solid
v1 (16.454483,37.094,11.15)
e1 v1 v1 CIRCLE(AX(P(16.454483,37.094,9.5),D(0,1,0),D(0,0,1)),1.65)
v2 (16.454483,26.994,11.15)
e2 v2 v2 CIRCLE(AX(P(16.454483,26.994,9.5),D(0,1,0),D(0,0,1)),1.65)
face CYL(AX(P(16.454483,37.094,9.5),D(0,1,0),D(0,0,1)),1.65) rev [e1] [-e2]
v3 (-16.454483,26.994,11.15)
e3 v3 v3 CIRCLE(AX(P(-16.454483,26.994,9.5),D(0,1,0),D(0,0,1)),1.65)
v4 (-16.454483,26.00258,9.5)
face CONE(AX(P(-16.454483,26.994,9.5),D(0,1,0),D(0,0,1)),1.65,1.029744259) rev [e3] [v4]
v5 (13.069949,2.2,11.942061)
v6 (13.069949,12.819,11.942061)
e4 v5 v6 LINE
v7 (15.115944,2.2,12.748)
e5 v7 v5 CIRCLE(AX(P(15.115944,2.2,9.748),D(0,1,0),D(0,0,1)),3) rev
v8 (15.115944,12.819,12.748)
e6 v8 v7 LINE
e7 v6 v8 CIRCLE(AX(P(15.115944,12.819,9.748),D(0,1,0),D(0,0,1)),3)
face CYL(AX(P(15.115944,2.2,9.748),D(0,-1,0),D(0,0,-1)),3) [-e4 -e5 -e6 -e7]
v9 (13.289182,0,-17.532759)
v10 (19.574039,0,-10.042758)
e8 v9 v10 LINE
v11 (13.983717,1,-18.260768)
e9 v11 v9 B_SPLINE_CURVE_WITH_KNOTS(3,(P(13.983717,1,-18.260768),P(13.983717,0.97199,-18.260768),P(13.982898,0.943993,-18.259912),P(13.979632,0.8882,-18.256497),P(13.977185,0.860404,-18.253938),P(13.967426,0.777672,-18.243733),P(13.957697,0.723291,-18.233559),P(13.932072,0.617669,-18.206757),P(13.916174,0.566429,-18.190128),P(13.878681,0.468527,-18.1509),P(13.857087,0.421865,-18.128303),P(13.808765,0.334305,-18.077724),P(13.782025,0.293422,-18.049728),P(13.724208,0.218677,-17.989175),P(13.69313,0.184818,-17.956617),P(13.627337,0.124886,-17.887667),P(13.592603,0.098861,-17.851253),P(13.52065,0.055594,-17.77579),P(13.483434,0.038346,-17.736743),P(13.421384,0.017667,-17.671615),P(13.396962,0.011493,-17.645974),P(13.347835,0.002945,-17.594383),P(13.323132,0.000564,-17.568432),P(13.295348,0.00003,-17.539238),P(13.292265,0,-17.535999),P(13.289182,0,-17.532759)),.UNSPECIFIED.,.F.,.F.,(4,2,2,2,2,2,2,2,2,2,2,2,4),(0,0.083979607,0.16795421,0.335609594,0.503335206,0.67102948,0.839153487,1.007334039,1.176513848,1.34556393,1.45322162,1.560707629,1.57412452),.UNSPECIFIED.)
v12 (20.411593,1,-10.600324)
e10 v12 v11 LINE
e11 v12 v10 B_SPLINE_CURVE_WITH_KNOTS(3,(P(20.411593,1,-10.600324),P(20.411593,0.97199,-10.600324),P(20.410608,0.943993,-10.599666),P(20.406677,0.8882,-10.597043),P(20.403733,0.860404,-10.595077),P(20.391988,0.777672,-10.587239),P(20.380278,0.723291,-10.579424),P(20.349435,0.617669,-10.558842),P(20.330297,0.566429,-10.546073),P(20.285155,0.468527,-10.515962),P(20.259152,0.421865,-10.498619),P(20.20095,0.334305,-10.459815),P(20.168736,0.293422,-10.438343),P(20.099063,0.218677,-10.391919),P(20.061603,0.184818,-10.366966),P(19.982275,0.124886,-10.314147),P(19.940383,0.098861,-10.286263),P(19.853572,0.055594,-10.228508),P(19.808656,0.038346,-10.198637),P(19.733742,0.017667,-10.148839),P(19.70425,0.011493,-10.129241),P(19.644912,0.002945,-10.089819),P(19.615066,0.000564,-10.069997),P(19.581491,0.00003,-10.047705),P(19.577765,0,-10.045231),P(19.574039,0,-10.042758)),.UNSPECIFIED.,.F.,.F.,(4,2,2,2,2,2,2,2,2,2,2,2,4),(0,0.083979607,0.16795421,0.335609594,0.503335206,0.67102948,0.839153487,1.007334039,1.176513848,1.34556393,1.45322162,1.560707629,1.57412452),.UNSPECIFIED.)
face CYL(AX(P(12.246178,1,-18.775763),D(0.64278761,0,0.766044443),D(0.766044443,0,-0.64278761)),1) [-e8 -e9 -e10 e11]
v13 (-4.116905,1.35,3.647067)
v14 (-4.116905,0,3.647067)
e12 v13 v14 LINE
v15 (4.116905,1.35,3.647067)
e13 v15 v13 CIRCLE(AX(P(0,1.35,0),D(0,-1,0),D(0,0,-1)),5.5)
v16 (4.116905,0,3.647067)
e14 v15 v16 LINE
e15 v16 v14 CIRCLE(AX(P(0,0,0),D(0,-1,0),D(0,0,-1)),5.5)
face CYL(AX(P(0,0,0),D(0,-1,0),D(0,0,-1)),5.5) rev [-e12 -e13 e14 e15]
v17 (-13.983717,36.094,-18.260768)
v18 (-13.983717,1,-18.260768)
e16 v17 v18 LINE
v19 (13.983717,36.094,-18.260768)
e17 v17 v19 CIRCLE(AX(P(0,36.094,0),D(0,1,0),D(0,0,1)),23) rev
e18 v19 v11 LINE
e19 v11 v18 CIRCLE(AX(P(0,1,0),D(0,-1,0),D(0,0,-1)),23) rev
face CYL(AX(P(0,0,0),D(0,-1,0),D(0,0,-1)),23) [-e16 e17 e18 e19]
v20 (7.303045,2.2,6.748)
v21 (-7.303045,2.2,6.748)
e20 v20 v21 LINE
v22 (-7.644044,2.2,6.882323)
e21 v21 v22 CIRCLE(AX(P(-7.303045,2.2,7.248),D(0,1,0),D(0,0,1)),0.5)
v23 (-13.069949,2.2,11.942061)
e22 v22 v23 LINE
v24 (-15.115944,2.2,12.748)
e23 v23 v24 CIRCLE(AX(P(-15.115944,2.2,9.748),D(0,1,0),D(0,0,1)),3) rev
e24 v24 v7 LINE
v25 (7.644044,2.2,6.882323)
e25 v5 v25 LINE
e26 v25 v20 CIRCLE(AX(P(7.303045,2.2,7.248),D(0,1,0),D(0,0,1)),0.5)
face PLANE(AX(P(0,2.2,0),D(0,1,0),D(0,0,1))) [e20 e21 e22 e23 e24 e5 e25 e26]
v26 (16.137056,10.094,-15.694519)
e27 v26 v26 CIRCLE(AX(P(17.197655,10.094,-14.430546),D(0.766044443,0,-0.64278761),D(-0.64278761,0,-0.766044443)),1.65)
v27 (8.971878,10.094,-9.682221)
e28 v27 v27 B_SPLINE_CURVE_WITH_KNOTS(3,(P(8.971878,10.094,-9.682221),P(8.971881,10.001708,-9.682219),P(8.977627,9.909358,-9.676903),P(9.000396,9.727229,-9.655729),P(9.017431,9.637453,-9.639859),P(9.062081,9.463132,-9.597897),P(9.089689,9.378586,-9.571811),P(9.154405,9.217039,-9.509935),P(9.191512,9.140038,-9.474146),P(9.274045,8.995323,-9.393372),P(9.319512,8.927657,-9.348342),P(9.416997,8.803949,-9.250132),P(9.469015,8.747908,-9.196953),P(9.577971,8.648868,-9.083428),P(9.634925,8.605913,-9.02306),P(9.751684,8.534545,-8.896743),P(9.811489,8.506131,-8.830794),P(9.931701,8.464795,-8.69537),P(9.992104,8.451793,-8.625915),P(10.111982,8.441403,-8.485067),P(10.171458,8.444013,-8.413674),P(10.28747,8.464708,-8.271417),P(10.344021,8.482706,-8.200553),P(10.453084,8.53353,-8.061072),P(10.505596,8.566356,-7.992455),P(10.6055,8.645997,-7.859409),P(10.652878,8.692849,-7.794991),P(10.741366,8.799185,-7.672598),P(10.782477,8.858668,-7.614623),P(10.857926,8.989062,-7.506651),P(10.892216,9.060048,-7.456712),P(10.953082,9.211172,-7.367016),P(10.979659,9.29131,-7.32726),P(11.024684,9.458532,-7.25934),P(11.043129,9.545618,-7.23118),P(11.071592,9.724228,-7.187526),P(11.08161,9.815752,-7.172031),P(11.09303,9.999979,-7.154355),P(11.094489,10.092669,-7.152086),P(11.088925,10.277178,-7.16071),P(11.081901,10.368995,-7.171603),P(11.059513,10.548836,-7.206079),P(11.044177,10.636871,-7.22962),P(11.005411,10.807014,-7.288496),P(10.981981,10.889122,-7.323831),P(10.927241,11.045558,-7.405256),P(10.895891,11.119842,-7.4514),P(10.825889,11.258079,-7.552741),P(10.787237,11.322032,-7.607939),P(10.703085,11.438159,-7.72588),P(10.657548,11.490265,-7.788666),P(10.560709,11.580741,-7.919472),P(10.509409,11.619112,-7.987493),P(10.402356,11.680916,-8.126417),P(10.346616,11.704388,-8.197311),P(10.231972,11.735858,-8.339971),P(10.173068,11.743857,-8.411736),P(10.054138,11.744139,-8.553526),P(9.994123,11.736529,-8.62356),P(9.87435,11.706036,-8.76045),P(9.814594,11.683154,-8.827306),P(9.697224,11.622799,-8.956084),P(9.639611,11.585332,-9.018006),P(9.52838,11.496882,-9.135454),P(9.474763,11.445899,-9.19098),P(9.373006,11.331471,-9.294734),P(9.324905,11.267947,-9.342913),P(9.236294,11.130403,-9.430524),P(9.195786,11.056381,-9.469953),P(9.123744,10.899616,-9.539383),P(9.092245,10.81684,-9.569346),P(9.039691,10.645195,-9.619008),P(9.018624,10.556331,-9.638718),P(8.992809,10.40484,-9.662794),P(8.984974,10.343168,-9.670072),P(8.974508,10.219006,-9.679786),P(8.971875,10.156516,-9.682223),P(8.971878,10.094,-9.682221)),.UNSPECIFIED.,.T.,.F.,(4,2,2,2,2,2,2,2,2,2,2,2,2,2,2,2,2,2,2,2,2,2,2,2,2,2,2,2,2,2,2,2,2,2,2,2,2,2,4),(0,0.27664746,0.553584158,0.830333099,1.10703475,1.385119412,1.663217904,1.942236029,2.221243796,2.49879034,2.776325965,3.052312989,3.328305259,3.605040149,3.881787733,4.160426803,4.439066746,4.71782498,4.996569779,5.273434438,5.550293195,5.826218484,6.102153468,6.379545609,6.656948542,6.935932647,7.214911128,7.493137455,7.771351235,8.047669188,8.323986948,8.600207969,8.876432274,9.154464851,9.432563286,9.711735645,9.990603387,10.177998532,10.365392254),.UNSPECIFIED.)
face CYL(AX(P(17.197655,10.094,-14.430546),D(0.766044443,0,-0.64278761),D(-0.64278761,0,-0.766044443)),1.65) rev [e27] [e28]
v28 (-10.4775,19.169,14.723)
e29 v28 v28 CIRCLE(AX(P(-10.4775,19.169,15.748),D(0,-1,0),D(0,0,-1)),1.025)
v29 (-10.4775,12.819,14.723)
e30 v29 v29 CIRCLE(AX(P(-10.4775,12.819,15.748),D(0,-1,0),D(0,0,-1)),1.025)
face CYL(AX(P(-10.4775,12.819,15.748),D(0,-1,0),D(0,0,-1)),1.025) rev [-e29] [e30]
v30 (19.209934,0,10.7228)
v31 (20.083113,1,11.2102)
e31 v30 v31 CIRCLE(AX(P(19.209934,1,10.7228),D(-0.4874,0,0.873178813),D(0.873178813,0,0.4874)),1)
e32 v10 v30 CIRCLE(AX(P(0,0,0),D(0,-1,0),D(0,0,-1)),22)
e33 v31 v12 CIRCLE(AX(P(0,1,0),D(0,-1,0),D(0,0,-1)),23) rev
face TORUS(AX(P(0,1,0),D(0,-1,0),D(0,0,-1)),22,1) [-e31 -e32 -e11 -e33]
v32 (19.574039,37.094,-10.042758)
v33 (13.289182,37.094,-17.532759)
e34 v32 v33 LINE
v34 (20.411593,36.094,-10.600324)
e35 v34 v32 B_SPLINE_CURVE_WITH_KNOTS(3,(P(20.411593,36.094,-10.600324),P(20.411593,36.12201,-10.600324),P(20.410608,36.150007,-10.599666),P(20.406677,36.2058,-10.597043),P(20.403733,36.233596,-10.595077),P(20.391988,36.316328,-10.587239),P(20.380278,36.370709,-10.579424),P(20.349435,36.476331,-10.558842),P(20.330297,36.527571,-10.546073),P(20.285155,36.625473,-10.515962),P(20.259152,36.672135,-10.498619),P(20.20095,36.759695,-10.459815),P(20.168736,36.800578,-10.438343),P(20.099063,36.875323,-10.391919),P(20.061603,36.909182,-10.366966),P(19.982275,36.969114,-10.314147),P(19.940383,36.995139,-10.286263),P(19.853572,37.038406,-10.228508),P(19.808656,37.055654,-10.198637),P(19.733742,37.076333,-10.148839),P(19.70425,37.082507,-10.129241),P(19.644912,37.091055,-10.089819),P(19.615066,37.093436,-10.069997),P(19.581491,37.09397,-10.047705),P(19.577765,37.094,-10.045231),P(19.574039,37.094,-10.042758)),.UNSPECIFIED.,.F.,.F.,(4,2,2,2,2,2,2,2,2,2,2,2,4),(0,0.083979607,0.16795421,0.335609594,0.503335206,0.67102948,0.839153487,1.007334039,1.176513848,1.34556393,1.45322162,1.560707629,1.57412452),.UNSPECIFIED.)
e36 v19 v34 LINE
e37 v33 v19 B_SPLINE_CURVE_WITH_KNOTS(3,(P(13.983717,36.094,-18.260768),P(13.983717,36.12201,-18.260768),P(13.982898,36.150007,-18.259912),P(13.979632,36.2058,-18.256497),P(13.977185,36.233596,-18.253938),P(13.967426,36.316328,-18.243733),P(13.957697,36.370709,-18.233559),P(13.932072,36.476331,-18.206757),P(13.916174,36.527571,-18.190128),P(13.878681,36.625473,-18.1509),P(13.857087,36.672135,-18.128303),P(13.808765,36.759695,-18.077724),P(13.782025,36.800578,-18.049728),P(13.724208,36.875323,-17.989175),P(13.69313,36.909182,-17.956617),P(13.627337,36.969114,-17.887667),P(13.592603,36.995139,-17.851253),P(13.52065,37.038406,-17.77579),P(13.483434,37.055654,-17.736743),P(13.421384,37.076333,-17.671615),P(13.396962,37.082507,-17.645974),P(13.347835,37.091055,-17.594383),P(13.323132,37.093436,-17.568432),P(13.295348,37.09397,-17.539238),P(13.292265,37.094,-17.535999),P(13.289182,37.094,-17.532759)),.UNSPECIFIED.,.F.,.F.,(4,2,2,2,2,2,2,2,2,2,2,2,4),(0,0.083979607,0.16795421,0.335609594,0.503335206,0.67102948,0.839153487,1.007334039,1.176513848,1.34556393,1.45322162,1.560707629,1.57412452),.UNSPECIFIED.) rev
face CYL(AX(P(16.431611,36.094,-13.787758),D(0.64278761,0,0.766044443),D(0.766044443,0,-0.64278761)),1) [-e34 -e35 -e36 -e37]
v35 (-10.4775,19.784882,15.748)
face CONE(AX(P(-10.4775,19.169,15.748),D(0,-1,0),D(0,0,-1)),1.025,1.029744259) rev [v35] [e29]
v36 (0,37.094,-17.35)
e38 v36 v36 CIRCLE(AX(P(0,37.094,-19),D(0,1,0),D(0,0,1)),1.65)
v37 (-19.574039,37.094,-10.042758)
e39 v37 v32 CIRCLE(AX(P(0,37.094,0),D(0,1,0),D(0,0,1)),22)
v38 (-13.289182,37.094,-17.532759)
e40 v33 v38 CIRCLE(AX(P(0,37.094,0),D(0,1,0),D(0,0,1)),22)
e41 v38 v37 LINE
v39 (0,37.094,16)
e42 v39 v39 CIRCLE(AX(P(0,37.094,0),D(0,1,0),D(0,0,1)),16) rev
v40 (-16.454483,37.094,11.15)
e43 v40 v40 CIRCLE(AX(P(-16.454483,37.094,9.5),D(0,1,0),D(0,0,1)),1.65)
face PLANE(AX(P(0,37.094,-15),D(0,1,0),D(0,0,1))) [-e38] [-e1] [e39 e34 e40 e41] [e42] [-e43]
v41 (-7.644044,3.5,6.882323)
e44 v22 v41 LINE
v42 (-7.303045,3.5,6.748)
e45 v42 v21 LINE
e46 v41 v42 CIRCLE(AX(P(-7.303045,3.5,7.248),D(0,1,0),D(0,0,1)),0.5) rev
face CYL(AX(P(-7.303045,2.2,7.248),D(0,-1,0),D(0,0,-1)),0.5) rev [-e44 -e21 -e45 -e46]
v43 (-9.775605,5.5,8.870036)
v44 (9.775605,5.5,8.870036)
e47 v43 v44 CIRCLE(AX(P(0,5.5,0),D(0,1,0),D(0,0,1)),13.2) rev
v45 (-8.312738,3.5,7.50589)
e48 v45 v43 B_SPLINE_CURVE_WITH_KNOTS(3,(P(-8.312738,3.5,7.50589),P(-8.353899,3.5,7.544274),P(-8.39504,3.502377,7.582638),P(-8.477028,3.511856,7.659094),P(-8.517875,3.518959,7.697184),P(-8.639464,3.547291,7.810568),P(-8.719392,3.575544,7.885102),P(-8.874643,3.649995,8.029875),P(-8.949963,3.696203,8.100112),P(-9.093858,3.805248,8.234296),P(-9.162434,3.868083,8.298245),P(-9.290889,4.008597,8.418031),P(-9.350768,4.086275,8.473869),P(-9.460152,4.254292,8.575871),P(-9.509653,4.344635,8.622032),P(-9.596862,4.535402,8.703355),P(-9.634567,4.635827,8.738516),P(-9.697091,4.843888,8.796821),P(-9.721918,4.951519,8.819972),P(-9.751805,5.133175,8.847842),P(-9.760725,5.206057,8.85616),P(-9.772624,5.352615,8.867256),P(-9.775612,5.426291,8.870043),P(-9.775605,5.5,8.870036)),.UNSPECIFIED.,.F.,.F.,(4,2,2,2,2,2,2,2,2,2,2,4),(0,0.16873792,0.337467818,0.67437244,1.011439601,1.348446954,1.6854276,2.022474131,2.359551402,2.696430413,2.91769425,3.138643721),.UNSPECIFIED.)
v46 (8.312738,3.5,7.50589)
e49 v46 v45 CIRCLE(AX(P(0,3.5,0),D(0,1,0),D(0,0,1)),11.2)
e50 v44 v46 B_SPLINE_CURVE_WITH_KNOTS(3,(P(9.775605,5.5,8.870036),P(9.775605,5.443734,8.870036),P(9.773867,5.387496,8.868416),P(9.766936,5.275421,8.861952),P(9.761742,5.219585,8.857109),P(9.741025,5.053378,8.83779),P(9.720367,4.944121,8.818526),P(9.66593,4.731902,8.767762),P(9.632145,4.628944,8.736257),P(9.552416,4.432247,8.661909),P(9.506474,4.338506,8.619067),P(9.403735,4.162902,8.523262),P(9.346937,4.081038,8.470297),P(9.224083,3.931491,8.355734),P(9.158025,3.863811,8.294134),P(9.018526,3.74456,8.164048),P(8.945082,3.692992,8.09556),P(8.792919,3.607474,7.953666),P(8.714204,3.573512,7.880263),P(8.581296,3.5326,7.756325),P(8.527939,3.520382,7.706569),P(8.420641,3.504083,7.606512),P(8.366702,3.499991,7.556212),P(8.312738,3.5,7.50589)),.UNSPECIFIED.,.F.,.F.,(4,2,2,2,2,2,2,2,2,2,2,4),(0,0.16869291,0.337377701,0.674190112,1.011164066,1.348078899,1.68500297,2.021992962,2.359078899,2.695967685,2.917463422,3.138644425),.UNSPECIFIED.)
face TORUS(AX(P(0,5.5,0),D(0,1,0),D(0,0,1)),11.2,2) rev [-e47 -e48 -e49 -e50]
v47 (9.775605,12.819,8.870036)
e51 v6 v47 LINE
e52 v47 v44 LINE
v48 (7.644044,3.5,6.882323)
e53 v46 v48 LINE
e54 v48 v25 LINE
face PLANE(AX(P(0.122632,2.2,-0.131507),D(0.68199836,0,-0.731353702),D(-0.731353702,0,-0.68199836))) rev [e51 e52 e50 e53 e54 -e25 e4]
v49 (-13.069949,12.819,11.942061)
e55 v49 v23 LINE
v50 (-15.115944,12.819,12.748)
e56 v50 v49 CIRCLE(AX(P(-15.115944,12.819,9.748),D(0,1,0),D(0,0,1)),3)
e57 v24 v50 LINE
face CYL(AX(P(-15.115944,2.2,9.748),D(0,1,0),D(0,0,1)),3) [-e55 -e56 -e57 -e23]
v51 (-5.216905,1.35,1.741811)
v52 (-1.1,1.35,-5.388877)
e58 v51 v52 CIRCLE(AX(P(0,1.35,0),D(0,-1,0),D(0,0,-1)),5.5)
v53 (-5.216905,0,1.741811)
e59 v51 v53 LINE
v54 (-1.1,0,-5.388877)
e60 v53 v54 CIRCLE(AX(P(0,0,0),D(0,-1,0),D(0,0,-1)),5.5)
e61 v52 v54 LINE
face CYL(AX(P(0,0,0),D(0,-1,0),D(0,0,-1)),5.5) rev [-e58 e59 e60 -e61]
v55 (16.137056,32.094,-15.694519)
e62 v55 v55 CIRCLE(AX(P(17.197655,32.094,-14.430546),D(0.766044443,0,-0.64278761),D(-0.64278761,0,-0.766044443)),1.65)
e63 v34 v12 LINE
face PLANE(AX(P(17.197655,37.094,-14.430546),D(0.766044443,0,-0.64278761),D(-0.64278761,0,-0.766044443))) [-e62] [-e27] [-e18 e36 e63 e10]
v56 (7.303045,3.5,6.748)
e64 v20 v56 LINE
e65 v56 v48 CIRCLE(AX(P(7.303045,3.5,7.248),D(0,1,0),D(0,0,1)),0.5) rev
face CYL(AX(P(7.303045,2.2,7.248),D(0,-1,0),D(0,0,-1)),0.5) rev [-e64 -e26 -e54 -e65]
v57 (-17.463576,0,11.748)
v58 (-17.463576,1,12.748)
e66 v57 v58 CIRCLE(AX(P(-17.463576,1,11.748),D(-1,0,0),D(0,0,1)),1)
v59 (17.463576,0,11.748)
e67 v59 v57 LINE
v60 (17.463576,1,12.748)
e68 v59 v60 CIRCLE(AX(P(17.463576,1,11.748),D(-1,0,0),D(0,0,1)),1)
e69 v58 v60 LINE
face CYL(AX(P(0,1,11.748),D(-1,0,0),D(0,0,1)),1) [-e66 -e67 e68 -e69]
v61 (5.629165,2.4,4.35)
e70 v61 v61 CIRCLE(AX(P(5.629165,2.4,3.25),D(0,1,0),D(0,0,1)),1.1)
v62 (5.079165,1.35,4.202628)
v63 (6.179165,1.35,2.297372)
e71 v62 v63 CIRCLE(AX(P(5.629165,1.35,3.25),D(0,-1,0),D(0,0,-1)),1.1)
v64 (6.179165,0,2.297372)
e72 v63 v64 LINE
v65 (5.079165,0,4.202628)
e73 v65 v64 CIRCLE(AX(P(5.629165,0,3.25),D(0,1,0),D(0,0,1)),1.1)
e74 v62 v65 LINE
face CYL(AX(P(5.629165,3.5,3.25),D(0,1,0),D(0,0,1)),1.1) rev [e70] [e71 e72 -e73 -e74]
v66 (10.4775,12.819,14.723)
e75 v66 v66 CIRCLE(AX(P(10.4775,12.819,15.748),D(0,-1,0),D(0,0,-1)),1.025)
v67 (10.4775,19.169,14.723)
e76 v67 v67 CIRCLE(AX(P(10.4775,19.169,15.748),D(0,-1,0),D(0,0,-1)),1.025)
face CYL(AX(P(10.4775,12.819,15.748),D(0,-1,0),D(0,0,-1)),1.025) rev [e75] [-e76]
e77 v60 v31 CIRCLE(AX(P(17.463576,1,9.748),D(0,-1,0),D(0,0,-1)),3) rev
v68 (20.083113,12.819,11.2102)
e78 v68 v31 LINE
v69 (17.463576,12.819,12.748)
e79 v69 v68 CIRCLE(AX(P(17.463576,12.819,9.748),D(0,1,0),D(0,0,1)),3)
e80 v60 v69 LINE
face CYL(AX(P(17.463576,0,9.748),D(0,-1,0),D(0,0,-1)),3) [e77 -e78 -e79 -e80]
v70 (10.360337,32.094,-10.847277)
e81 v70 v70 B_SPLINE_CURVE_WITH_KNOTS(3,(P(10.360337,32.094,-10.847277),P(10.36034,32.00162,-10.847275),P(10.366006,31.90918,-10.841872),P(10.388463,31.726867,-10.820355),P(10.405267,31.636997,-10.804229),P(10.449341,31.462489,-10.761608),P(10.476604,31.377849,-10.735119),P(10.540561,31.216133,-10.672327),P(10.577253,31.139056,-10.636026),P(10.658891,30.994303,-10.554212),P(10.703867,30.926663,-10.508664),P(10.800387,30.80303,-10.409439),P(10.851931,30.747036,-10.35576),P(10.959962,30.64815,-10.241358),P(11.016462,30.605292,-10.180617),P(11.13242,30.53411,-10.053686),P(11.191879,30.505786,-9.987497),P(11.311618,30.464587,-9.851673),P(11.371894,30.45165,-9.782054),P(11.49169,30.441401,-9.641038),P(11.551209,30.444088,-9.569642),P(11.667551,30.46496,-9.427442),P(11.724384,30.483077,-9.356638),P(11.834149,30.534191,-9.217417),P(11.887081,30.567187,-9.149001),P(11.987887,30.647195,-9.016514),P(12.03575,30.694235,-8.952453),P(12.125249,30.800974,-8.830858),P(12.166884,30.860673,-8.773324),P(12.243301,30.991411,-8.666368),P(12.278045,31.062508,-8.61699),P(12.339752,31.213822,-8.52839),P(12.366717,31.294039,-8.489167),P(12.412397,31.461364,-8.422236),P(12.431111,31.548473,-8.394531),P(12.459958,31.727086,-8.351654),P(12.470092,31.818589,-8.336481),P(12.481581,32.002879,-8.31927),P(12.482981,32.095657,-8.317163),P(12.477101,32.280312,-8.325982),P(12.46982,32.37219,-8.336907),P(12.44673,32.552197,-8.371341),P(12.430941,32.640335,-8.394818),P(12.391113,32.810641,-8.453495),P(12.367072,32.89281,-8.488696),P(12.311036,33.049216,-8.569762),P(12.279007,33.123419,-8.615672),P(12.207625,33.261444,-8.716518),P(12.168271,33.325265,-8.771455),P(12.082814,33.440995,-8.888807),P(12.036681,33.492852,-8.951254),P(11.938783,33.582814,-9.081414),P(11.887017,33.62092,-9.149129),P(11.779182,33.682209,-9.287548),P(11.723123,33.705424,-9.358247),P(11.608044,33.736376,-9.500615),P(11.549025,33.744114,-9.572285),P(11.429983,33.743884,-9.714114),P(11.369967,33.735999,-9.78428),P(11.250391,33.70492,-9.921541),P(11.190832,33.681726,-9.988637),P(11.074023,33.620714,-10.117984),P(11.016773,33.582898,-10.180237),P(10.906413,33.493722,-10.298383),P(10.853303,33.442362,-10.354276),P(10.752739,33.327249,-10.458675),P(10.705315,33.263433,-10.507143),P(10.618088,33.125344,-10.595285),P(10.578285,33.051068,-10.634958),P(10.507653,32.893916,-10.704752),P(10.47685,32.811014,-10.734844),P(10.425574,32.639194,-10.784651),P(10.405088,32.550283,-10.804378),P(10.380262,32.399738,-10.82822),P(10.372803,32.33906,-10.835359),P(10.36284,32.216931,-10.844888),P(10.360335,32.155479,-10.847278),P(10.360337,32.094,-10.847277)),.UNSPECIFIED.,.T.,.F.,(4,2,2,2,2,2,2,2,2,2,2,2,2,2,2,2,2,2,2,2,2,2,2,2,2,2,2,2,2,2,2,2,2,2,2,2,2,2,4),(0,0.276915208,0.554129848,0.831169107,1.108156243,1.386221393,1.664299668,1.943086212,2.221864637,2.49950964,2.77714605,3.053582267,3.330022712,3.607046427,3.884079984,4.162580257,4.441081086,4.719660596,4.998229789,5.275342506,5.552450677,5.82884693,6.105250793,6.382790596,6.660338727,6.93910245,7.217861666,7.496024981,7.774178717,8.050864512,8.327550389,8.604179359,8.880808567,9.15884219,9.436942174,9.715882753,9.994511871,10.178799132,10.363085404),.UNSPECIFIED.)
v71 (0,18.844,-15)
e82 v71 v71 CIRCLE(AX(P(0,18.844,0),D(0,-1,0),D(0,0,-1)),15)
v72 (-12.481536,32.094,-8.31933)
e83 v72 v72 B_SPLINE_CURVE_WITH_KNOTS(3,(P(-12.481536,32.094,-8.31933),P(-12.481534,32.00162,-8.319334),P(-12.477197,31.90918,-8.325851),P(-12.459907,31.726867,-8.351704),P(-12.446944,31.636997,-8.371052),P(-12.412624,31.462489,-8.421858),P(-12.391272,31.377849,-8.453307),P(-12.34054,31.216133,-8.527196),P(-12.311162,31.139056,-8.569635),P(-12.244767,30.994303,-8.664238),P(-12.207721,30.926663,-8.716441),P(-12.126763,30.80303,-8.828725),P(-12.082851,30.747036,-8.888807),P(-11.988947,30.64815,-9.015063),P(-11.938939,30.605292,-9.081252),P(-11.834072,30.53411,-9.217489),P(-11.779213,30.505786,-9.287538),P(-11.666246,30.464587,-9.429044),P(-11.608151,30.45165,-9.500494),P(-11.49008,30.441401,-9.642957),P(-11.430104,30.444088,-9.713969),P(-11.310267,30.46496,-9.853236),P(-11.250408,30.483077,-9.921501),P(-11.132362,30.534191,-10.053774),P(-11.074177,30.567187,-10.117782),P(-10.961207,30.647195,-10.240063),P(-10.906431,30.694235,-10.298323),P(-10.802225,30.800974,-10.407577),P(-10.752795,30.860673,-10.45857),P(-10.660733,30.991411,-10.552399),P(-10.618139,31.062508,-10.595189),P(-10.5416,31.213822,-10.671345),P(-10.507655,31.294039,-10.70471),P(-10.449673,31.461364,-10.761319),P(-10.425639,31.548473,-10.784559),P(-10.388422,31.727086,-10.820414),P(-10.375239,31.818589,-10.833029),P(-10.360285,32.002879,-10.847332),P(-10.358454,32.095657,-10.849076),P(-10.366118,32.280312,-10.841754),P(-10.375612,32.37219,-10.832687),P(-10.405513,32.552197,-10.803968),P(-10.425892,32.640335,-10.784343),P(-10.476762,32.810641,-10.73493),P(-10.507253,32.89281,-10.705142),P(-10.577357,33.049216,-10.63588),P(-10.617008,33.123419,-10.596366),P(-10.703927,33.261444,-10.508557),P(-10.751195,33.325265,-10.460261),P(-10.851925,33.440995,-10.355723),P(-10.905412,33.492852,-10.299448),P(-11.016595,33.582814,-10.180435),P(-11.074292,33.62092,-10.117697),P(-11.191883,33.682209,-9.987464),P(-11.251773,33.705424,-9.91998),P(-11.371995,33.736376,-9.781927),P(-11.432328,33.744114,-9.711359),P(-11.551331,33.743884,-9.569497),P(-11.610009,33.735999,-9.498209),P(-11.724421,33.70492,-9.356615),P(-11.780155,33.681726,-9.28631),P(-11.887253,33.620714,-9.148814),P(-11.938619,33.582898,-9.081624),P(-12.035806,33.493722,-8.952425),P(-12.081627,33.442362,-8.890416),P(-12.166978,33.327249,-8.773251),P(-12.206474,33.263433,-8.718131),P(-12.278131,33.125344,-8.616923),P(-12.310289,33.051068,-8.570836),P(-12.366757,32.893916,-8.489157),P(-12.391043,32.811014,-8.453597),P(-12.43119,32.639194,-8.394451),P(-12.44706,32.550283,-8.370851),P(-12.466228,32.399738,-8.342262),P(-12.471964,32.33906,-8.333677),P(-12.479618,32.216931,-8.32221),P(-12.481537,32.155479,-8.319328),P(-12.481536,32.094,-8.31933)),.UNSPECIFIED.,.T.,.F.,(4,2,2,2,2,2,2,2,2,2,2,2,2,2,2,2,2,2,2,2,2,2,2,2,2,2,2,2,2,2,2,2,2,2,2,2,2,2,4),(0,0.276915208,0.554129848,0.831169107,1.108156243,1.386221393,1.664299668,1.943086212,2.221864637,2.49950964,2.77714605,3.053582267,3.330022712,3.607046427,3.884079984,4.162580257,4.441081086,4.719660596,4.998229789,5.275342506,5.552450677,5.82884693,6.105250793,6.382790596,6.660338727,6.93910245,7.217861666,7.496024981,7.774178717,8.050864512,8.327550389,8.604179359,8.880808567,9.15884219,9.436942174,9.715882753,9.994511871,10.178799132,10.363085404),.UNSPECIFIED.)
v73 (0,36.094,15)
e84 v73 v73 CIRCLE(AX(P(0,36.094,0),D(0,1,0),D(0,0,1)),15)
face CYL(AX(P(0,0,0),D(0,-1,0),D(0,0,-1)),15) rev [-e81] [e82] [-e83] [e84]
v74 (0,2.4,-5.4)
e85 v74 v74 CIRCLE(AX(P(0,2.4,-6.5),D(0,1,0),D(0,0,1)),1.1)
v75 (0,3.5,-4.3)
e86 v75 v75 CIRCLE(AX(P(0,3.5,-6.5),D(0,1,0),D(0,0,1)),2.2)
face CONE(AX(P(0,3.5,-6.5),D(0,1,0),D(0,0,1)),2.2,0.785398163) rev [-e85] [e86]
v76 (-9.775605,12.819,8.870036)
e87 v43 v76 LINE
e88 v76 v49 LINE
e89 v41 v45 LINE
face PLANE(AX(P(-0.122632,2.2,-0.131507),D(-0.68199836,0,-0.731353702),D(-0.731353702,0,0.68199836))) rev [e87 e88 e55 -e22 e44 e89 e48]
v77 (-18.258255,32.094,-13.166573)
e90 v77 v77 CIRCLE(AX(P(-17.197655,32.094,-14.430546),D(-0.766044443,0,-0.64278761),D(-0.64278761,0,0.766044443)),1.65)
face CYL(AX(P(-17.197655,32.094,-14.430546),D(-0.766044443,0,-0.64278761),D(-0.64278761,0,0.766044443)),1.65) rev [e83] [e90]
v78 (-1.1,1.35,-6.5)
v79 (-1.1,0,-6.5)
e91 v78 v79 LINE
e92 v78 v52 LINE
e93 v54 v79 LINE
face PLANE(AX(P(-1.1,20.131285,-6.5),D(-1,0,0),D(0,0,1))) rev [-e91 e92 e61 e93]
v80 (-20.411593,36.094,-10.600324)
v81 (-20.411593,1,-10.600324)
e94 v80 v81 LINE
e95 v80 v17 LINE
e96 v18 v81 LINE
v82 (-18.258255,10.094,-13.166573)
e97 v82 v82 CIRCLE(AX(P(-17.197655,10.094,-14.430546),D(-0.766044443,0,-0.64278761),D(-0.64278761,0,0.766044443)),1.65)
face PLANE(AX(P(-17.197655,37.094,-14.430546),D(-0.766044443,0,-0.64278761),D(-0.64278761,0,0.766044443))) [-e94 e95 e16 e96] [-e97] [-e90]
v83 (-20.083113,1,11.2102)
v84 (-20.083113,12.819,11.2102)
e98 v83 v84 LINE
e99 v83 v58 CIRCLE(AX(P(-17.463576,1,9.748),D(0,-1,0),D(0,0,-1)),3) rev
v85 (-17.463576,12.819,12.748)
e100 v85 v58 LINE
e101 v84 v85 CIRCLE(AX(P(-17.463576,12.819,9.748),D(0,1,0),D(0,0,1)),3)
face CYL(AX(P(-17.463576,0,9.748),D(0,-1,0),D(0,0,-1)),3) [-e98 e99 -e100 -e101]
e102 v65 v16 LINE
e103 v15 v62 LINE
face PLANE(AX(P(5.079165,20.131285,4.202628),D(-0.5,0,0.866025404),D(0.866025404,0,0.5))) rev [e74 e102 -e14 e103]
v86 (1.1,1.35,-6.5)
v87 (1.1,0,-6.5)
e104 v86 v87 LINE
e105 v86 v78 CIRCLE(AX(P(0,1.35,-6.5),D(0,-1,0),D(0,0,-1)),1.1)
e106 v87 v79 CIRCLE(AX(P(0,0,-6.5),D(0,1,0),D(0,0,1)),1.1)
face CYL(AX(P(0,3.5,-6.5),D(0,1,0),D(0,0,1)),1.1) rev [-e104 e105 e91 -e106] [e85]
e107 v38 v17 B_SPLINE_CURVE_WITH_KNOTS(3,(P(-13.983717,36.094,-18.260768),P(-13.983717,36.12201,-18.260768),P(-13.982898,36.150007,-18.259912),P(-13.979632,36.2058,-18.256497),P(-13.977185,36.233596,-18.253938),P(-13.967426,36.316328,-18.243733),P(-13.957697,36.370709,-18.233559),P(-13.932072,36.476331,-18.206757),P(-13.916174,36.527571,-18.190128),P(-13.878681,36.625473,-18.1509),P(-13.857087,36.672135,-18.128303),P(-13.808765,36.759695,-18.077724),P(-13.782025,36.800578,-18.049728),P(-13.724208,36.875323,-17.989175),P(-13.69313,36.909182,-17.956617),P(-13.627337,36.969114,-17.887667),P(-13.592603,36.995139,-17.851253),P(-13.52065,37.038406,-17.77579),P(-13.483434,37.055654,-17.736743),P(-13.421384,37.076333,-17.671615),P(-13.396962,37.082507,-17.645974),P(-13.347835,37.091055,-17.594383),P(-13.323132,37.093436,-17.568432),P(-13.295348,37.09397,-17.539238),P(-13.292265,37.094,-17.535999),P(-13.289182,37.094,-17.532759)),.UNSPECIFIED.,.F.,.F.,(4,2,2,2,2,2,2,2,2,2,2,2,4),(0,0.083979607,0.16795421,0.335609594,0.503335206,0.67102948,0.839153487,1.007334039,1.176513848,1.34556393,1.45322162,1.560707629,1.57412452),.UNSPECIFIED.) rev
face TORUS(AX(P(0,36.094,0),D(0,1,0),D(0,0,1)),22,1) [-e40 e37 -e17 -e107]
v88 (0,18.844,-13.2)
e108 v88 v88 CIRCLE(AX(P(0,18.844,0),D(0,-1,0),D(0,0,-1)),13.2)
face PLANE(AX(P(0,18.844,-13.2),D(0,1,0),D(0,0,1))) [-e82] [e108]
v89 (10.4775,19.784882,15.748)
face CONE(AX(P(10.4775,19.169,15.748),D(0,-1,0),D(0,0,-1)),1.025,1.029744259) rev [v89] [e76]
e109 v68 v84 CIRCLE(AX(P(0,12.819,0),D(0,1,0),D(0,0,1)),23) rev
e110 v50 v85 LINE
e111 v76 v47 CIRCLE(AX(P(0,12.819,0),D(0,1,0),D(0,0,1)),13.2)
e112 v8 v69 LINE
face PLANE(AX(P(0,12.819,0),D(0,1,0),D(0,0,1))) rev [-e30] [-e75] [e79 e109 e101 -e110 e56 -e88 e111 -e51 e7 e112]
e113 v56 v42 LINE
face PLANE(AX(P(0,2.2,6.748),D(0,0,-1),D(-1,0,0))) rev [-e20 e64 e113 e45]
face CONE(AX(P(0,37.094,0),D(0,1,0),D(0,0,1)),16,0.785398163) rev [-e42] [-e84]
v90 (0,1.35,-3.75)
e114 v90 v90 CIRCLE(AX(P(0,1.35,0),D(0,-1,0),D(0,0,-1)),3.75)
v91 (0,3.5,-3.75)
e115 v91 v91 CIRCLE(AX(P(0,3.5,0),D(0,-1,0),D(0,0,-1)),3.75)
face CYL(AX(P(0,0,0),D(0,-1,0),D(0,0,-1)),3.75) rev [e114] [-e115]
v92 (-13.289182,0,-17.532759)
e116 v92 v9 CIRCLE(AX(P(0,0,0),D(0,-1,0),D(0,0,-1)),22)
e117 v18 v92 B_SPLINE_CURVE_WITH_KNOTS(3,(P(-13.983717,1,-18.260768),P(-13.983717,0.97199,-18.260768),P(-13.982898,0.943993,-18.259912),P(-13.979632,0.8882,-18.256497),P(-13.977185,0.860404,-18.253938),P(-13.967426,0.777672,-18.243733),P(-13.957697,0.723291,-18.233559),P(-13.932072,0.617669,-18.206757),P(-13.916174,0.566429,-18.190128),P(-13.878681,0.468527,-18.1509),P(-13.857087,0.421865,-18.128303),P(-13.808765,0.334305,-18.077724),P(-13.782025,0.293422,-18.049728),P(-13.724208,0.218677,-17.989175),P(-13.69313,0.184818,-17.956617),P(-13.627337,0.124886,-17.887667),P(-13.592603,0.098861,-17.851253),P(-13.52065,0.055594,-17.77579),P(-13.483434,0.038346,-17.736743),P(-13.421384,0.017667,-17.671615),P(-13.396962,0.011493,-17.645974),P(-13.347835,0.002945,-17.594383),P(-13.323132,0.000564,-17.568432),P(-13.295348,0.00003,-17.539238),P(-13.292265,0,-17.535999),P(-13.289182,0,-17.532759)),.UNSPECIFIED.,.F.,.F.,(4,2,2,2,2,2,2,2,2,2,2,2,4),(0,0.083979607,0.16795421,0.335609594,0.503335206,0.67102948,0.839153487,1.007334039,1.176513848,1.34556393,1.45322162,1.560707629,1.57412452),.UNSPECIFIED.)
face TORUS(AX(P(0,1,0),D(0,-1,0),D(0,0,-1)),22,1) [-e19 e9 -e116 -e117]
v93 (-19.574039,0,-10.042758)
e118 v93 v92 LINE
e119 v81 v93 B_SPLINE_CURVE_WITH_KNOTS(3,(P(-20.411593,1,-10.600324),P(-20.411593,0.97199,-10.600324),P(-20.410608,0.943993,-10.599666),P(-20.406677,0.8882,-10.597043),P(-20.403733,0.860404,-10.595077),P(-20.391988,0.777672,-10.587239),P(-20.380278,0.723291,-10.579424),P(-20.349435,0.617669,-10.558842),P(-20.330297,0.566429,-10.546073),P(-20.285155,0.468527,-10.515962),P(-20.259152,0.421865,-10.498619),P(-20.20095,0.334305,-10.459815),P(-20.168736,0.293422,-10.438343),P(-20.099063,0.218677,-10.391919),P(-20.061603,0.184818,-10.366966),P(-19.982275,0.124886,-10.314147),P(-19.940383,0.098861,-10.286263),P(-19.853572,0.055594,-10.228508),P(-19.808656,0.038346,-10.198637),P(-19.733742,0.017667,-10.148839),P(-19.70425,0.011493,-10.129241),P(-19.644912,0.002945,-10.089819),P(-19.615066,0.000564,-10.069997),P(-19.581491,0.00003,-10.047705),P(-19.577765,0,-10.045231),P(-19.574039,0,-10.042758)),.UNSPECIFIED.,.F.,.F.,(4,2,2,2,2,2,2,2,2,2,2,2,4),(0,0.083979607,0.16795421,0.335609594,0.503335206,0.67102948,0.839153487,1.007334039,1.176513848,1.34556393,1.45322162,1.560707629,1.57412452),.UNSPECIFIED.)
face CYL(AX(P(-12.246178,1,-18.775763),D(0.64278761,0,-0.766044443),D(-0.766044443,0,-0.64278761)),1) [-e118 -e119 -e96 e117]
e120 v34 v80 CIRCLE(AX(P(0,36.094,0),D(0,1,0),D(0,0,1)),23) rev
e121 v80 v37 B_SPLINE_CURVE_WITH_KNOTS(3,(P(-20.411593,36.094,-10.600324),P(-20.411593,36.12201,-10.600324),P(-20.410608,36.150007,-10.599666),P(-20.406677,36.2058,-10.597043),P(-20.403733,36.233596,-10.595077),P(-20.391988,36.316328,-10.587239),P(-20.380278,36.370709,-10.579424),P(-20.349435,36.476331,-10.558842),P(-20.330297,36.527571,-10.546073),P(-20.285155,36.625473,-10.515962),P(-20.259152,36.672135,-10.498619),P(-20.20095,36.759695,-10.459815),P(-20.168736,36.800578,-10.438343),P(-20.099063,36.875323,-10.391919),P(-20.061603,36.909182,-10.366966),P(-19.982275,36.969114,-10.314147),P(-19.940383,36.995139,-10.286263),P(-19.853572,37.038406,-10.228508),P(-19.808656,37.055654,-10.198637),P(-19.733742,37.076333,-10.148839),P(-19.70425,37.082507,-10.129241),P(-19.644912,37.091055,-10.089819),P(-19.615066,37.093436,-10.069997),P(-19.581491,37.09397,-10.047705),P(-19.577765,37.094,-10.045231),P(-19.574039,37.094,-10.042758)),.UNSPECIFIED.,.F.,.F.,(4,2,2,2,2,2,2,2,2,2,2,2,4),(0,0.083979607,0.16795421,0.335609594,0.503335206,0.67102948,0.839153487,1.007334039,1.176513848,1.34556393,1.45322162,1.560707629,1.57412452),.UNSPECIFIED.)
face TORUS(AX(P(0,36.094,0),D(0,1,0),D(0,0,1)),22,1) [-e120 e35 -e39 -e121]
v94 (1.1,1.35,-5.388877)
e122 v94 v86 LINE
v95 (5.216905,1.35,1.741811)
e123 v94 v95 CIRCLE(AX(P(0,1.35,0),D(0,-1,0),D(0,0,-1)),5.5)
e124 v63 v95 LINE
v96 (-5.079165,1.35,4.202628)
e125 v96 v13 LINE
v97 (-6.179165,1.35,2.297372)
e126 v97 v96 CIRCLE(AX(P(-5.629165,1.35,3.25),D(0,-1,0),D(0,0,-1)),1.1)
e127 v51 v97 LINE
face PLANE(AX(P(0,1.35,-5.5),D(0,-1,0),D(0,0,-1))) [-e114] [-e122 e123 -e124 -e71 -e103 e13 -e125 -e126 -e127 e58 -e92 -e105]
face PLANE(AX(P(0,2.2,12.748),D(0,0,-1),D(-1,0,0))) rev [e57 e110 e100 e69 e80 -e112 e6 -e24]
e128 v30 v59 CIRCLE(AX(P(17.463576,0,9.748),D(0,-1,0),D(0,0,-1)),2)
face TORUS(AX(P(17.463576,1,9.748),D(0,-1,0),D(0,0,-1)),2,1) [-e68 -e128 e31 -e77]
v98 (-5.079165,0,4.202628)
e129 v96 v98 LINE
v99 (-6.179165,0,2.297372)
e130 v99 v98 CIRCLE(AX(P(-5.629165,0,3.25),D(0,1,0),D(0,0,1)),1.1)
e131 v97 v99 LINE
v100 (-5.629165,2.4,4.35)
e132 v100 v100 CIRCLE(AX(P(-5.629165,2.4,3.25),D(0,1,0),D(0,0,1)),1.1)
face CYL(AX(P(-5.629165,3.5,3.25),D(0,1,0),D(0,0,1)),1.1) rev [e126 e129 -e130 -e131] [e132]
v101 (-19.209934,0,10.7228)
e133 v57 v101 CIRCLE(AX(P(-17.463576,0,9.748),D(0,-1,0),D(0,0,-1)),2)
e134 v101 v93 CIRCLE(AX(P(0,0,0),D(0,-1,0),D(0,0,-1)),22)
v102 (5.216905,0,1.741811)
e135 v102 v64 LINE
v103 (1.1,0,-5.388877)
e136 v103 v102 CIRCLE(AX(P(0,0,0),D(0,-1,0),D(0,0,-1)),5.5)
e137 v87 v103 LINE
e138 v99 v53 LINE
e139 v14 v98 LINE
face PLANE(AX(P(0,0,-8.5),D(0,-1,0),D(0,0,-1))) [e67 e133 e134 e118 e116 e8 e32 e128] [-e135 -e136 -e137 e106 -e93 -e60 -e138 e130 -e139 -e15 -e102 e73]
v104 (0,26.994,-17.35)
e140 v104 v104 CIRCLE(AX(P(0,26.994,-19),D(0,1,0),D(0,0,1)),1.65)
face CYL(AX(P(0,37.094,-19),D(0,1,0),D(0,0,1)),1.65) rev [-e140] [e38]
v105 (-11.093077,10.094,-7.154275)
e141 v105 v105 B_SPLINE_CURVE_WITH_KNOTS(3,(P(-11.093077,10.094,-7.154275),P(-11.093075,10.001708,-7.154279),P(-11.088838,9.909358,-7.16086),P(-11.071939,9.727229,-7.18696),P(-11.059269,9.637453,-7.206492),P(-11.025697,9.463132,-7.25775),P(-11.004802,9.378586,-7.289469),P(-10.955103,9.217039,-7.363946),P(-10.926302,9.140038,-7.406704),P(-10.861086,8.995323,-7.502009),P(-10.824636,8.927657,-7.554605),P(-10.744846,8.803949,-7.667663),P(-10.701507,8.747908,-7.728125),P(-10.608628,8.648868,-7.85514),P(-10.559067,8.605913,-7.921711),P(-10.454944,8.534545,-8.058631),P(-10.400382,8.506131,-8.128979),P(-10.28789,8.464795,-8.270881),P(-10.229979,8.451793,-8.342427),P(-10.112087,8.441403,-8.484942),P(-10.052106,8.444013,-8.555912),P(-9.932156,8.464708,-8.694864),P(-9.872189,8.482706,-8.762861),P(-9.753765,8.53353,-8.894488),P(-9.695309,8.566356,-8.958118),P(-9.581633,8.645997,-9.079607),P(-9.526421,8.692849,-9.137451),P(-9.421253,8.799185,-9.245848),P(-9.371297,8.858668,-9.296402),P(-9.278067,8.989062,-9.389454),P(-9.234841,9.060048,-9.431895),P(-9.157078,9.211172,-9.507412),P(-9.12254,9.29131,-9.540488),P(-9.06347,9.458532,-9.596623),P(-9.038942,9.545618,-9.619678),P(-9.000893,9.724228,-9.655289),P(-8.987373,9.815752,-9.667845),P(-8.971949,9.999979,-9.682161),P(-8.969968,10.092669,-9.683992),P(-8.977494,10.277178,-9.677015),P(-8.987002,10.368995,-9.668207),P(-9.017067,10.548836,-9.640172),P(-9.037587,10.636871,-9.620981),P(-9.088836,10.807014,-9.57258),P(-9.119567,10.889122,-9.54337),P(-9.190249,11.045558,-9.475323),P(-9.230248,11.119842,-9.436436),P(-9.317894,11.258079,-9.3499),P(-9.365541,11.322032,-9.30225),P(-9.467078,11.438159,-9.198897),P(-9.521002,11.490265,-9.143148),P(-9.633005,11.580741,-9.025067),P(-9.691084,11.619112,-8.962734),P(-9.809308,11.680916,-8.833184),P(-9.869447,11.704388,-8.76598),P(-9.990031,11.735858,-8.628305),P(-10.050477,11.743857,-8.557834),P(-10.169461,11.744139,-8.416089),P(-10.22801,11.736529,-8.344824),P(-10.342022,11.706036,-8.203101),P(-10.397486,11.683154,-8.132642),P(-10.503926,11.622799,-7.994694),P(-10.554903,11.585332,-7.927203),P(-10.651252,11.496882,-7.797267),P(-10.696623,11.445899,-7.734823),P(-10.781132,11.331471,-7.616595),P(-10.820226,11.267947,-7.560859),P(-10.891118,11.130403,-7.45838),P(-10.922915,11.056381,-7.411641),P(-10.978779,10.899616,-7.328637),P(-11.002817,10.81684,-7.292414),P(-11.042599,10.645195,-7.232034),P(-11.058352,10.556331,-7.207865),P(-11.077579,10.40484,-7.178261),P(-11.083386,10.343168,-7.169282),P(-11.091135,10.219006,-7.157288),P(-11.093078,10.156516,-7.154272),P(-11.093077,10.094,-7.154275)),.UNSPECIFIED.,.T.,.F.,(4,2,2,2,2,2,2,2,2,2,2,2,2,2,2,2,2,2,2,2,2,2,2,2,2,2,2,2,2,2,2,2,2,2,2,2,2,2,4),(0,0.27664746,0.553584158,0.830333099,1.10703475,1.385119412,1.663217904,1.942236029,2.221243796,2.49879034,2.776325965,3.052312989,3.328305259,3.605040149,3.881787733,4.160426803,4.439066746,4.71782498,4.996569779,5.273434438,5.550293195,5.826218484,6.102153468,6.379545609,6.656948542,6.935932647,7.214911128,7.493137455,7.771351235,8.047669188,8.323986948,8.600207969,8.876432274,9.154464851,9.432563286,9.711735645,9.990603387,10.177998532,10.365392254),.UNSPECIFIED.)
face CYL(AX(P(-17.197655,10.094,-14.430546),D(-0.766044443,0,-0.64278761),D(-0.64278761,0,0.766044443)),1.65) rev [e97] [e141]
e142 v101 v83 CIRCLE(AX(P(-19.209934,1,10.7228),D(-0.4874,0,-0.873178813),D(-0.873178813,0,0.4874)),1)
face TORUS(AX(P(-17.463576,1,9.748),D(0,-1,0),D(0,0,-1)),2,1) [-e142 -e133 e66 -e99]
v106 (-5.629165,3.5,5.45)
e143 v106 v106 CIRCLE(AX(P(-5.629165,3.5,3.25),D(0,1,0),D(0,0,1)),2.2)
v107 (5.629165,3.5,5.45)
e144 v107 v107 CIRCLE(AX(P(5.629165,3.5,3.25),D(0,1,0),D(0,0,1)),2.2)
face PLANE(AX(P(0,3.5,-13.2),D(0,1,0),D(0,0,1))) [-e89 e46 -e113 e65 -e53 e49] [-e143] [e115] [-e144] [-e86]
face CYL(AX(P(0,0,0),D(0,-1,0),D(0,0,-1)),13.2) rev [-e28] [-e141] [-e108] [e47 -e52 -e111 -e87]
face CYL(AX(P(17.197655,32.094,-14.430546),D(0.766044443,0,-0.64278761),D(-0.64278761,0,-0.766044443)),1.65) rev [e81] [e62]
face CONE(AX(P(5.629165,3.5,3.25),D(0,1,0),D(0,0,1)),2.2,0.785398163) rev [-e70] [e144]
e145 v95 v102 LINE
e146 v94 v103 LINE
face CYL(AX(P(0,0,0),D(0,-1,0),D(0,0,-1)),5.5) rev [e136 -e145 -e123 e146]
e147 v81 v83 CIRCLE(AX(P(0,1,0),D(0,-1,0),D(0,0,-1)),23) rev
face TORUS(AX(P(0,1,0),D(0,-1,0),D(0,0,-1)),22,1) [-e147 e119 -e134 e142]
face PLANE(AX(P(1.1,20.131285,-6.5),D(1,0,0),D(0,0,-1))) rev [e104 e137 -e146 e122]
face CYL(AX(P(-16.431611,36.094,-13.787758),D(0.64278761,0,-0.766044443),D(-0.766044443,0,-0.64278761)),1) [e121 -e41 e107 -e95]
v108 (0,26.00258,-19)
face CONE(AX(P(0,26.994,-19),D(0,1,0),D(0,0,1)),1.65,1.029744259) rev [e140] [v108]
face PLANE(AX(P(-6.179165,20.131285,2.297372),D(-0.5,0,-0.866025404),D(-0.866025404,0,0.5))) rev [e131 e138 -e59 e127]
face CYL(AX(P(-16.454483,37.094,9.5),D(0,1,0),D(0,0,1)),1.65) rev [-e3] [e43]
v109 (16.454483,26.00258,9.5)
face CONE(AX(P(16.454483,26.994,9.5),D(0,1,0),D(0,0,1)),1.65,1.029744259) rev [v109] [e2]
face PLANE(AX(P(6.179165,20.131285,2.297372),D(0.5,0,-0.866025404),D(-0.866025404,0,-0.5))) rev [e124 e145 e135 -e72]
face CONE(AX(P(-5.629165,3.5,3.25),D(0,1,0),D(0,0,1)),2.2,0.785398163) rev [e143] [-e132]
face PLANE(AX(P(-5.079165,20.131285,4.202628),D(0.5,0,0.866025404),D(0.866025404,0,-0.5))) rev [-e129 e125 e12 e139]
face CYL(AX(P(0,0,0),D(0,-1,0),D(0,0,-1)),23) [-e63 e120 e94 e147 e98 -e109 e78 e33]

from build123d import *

# Parameters (mm, degrees)
CSK_FOR_M2_COUNTERSUNK_FLAT_HEAD_SCREW1_D           = 2.2
CSK_FOR_M2_COUNTERSUNK_FLAT_HEAD_SCREW1_CSINK_D     = 4.4
CSK_FOR_M2_COUNTERSUNK_FLAT_HEAD_SCREW1_CSINK_ANGLE = 90
CUT_EXTRUDE1_DEPTH                                  = 9.319
CUT_EXTRUDE1_DEPTH_BACK                             = 1.3
FILLET1_R                                           = 3
FILLET2_R                                           = 2
CUT_EXTRUDE3_START                                  = -1.35
CUT_EXTRUDE3_DEPTH                                  = 1.35
M4_TAPPED_HOLE2_D                                   = 3.3
M4_TAPPED_HOLE2_DEPTH                               = 10.1
M4_TAPPED_HOLE2_TIP                                 = 0.991420021
M2_5_TAPPED_HOLE1_D                                 = 2.05
M2_5_TAPPED_HOLE1_DEPTH                             = 6.35
M2_5_TAPPED_HOLE1_TIP                               = 0.615882135
CUT_EXTRUDE4_REACH                                  = 51.335
SKETCH11_OUTSIDE_W                                  = 62.978
SKETCH11_OUTSIDE_H                                  = 62.978
CUT_EXTRUDE2_DEPTH                                  = 50.335229157
FILLET3_R                                           = 1
CHAMFER1_SIZE                                       = 1
M4_TAPPED_HOLE1_AT_2_COUNT                          = 2
M4_TAPPED_HOLE1_AT_2_PITCH                          = 22
FILLET4_R                                           = 0.5


with BuildPart() as part:
    # Sketch1 → Revolve1 (revolve)
    with BuildSketch(Plane(origin=(0, 0, 0), x_dir=(0, 0, -1), z_dir=(1, 0, 0))):
        Polygon((13.2, 3.5), (13.2, 18.844), (15, 18.844), (15, 37.094), (23, 37.094), (23, 16.013248777), (23, 0), (8.5, 0), (5.5, 0), (5.5, 1.35), (3.75, 1.35), (3.75, 3.5), align=None)
    revolve(axis=Axis((0, 0, 0), (0, 1, 0)))

    # CSK for M2 Countersunk Flat Head Screw1 (through all)
    with Locations(Plane(origin=(0, 3.5, 0), x_dir=(1, 0, 0), z_dir=(0, 1, 0))):
        with Locations((0, 6.5), (-5.629165125, -3.25), (5.629165125, -3.25)):
            CounterSinkHole(CSK_FOR_M2_COUNTERSUNK_FLAT_HEAD_SCREW1_D / 2, CSK_FOR_M2_COUNTERSUNK_FLAT_HEAD_SCREW1_CSINK_D / 2, counter_sink_angle=CSK_FOR_M2_COUNTERSUNK_FLAT_HEAD_SCREW1_CSINK_ANGLE)

    # Sketch5 → Cut-Extrude1 (cut, two sides: drawn at the far end of the back side and taken through both)
    with BuildSketch(Plane(origin=(0, 3.5, 0), x_dir=(1, 0, 0), z_dir=(0, 1, 0)).offset(-CUT_EXTRUDE1_DEPTH_BACK)):
        with BuildLine():
            Line((-13.5, -18.62122445), (-13.5, -29.562959847))
            Line((-13.5, -29.562959847), (13.5, -29.562959847))
            Line((13.5, -29.562959847), (13.5, -18.62122445))
            ThreePointArc((13.5, -18.62122445), (16.584015432, -15.936449797), (19.14388926, -12.748))
            Line((19.14388926, -12.748), (13.93421226, -12.748))
            Line((13.93421226, -12.748), (7.5, -6.748))
            Line((7.5, -6.748), (-7.5, -6.748))
            Line((-7.5, -6.748), (-13.93421226, -12.748))
            Line((-13.93421226, -12.748), (-19.14388926, -12.748))
            ThreePointArc((-19.14388926, -12.748), (-16.584015432, -15.936449797), (-13.5, -18.62122445))
        make_face()
    extrude(amount=CUT_EXTRUDE1_DEPTH + CUT_EXTRUDE1_DEPTH_BACK, mode=Mode.SUBTRACT)

    # Fillet1
    fillet1_edges = [part.edges().sort_by_distance(p)[0] for p in [
        (-19.14388926, 7.5095, 12.748),
        (-13.93421226, 7.5095, 12.748),
        (13.93421226, 7.5095, 12.748),
        (19.14388926, 7.5095, 12.748),
    ]]
    fillet(fillet1_edges, radius=FILLET1_R)

    # Fillet2
    fillet2_edges = [part.edges().sort_by_distance(p)[0] for p in [
        (12.06906123, 3.5, -5.345817152),
    ]]
    fillet(fillet2_edges, radius=FILLET2_R)

    # Sketch14 → Cut-Extrude3 (cut)
    with BuildSketch(Plane.XZ.offset(CUT_EXTRUDE3_START)):
        with BuildLine():
            Line((1.1, -6.5), (1.1, -5.388877434))
            ThreePointArc((1.1, -5.388877434), (4.763139721, -2.75), (5.216904756, 1.741810773))
            Line((5.216904756, 1.741810773), (6.179165125, 2.297372056))
            ThreePointArc((6.179165125, 2.297372056), (6.581793069, 3.8), (5.079165125, 4.202627944))
            Line((5.079165125, 4.202627944), (4.116904756, 3.647066661))
            ThreePointArc((4.116904756, 3.647066661), (0, 5.5), (-4.116904756, 3.647066661))
            Line((-4.116904756, 3.647066661), (-5.079165125, 4.202627944))
            ThreePointArc((-5.079165125, 4.202627944), (-6.581793069, 3.8), (-6.179165125, 2.297372056))
            Line((-6.179165125, 2.297372056), (-5.216904756, 1.741810773))
            ThreePointArc((-5.216904756, 1.741810773), (-4.763139721, -2.75), (-1.1, -5.388877434))
            Line((-1.1, -5.388877434), (-1.1, -6.5))
            ThreePointArc((-1.1, -6.5), (0, -7.6), (1.1, -6.5))
        make_face()
    extrude(amount=CUT_EXTRUDE3_DEPTH, mode=Mode.SUBTRACT)

    # M4 Tapped Hole2
    with Locations(Plane(origin=(0, 37.094, 0), x_dir=(-1, 0, 0), z_dir=(0, 1, 0))):
        with Locations((16.454482672, 9.5), (0, -19), (-16.454482672, 9.5)):
            Hole(M4_TAPPED_HOLE2_D / 2, depth=M4_TAPPED_HOLE2_DEPTH)
            with Locations((0, 0, -(M4_TAPPED_HOLE2_DEPTH + M4_TAPPED_HOLE2_TIP / 2))):  # 118° drill point
                Cone(0, M4_TAPPED_HOLE2_D / 2, M4_TAPPED_HOLE2_TIP, mode=Mode.SUBTRACT)

    # M2.5 Tapped Hole1
    with Locations(Plane(origin=(0, 12.819, 0), x_dir=(-1, 0, 0), z_dir=(0, -1, 0))):
        with Locations((-10.4775, -15.748), (10.4775, -15.748)):
            Hole(M2_5_TAPPED_HOLE1_D / 2, depth=M2_5_TAPPED_HOLE1_DEPTH)
            with Locations((0, 0, -(M2_5_TAPPED_HOLE1_DEPTH + M2_5_TAPPED_HOLE1_TIP / 2))):  # 118° drill point
                Cone(0, M2_5_TAPPED_HOLE1_D / 2, M2_5_TAPPED_HOLE1_TIP, mode=Mode.SUBTRACT)

    # Sketch15 → Cut-Extrude4 (cut, up to next)
    with BuildSketch(Plane.XZ, mode=Mode.PRIVATE) as cut_extrude4_sk1:
        with BuildLine():
            Line((15.115943687, 12.748), (17.463576266, 12.748))
            ThreePointArc((17.463576266, 12.748), (18.982358673, 12.335141279), (20.083112706, 11.2102))
            ThreePointArc((20.083112706, 11.2102), (0, 23), (-20.083112706, 11.2102))
            ThreePointArc((-20.083112706, 11.2102), (-18.982358673, 12.335141279), (-17.463576266, 12.748))
            Line((-17.463576266, 12.748), (-15.115943687, 12.748))
            Line((-15.115943687, 12.748), (15.115943687, 12.748))
        make_face()
    cut_extrude4_tool1 = extrude(cut_extrude4_sk1.sketch, amount=-CUT_EXTRUDE4_REACH, mode=Mode.PRIVATE) & part.part
    add(cut_extrude4_tool1.solids().sort_by_distance((0, 0, 16.923735))[0], mode=Mode.SUBTRACT)

    # Sketch11 outside → Cut-Extrude2 (cut, through all)
    with BuildSketch(Plane(origin=(0, 0, 0), x_dir=(1, 0, 0), z_dir=(0, 1, 0))):
        Rectangle(SKETCH11_OUTSIDE_W, SKETCH11_OUTSIDE_H)
        with BuildLine():
            Line((13.983717047, 18.260768263), (20.411593144, 10.600323832))
            ThreePointArc((20.411593144, 10.600323832), (0, -23), (-20.411593144, 10.600323832))
            Line((-20.411593144, 10.600323832), (-13.983717047, 18.260768263))
            ThreePointArc((-13.983717047, 18.260768263), (0, 23), (13.983717047, 18.260768263))
        make_face(mode=Mode.SUBTRACT)
    extrude(amount=CUT_EXTRUDE2_DEPTH, mode=Mode.SUBTRACT)

    # Fillet3
    # the kernel refuses this fillet: 1 mm, written as the material it takes off along each edge
    with BuildSketch(Plane(origin=(0, 0, 0), x_dir=(-0.8322161318186808, 0, -0.5544513594002202), z_dir=(0.5544513594002202, 0, -0.8322161318186808))) as fillet3_piece_1:
        with BuildLine():
            CenterArc((23 - FILLET3_R, FILLET3_R), FILLET3_R, 270, 90)
            Line((23 - FILLET3_R, 0), (23, 0))
            Line((23, 0), (23, FILLET3_R))
        make_face()
    revolve(axis=Axis((0, 0, 0), (0, 1, 0)), revolution_arc=62.84276799, mode=Mode.SUBTRACT)
    with BuildSketch(Plane(origin=(17.463576266, 0, 9.748), x_dir=(0, 0, 1), z_dir=(-1, 0, 0))) as fillet3_piece_2:
        with BuildLine():
            CenterArc((3 - FILLET3_R, FILLET3_R), FILLET3_R, 270, 90)
            Line((3, FILLET3_R), (3, 0))
            Line((3, 0), (3 - FILLET3_R, 0))
        make_face()
    revolve(axis=Axis((17.463576266, 0, 9.748), (0, 1, 0)), revolution_arc=60.830166101, mode=Mode.SUBTRACT)
    with BuildSketch(Plane(origin=(-17.463576266, 0, 9.748), x_dir=(-0.8731788133022929, 0, 0.48739999999999956), z_dir=(-0.48739999999999956, 0, -0.8731788133022929))) as fillet3_piece_3:
        with BuildLine():
            CenterArc((3 - FILLET3_R, FILLET3_R), FILLET3_R, 270, 90)
            Line((3 - FILLET3_R, 0), (3, 0))
            Line((3, 0), (3, FILLET3_R))
        make_face()
    revolve(axis=Axis((-17.463576266, 0, 9.748), (0, 1, 0)), revolution_arc=60.830166101, mode=Mode.SUBTRACT)
    with BuildSketch(Plane(origin=(17.463576266, 0, 12.748), x_dir=(0, 1, 0), z_dir=(-1, 0, 0))) as fillet3_piece_4:
        with BuildLine():
            CenterArc((FILLET3_R, FILLET3_R), FILLET3_R, 180, 90)
            Line((0, FILLET3_R), (0, 0))
            Line((0, 0), (FILLET3_R, 0))
        make_face()
    extrude(amount=34.927152532, mode=Mode.SUBTRACT)
    with BuildSketch(Plane(origin=(0, 37.094, 0), x_dir=(-0.8320605059369173, 0, -0.5546848785211302), z_dir=(0.5546848785211302, 0, -0.8320605059369173))) as fillet3_piece_5:
        with BuildLine():
            CenterArc((23 - FILLET3_R, -FILLET3_R), FILLET3_R, 0, 90)
            Line((23 - FILLET3_R, 0), (23, 0))
            Line((23, 0), (23, -FILLET3_R))
        make_face()
    revolve(axis=Axis((0, 37.094, 0), (0, 1, 0)), revolution_arc=247.378025481, mode=Mode.SUBTRACT)
    with BuildSketch(Plane(origin=(0, 37.094, 0), x_dir=(0.6905501820120585, 0, -0.7232844849180111), z_dir=(0.7232844849180111, 0, 0.6905501820120585))) as fillet3_piece_6:
        with BuildLine():
            CenterArc((23 - FILLET3_R, -FILLET3_R), FILLET3_R, 0, 90)
            Line((23 - FILLET3_R, 0), (23, 0))
            Line((23, 0), (23, -FILLET3_R))
        make_face()
    revolve(axis=Axis((0, 37.094, 0), (0, 1, 0)), revolution_arc=87.347352667, mode=Mode.SUBTRACT)
    with BuildSketch(Plane(origin=(0, 0, 0), x_dir=(-0.6905501820120575, 0, -0.7232844849180122), z_dir=(-0.7232844849180122, 0, 0.6905501820120575))) as fillet3_piece_7:
        with BuildLine():
            CenterArc((23 - FILLET3_R, -FILLET3_R), FILLET3_R, 0, 90)
            Line((23 - FILLET3_R, 0), (23, 0))
            Line((23, 0), (23, -FILLET3_R))
        make_face()
    revolve(axis=Axis((0, 0, 0), (0, -1, 0)), revolution_arc=87.347352667, mode=Mode.SUBTRACT)
    with BuildSketch(Plane(origin=(0, 0, 0), x_dir=(0.8731788133022923, 0, 0.48740000000000056), z_dir=(-0.48740000000000056, 0, 0.8731788133022923))) as fillet3_piece_8:
        with BuildLine():
            CenterArc((23 - FILLET3_R, FILLET3_R), FILLET3_R, 270, 90)
            Line((23 - FILLET3_R, 0), (23, 0))
            Line((23, 0), (23, FILLET3_R))
        make_face()
    revolve(axis=Axis((0, 0, 0), (0, 1, 0)), revolution_arc=62.84276799, mode=Mode.SUBTRACT)
    with BuildSketch(Plane(origin=(-22.018562168, 37.094, -8.685212724), x_dir=(0, -1, 0), z_dir=(0.6427876096865434, 0, -0.7660444431189748))) as fillet3_piece_9:
        with BuildLine():
            CenterArc((FILLET3_R, -FILLET3_R), FILLET3_R, 90, 90)
            Line((0, -FILLET3_R), (0, 0))
            Line((0, 0), (FILLET3_R, 0))
        make_face()
    extrude(amount=15, mode=Mode.SUBTRACT)
    with BuildSketch(Plane(origin=(12.376748023, 37.094, -20.175879371), x_dir=(-0.7660444431189747, 0, 0.6427876096865432), z_dir=(0.6427876096865434, 0, 0.7660444431189748)), Plane(origin=(12.376748023, 0, -20.175879371), x_dir=(0, 1, 0), z_dir=(0.6427876096865434, 0, 0.7660444431189748)), Plane(origin=(-22.018562168, 0, -8.685212724), x_dir=(0, 1, 0), z_dir=(0.6427876096865434, 0, -0.7660444431189748))) as fillet3_piece_10:
        with BuildLine():
            CenterArc((FILLET3_R, FILLET3_R), FILLET3_R, 180, 90)
            Line((0, FILLET3_R), (0, 0))
            Line((0, 0), (FILLET3_R, 0))
        make_face()
    extrude(amount=15, mode=Mode.SUBTRACT)

    # Chamfer1
    chamfer1_edges = [part.edges().sort_by_distance(p)[0] for p in [
        (0, 37.094, 15),
    ]]
    chamfer(chamfer1_edges, length=CHAMFER1_SIZE)

    # Sketch12 → M4 Tapped Hole1 (revolve, cut)
    with BuildSketch(Plane(origin=(17.197655095, 10.094, -14.430546047), x_dir=(-0.6427876096865435, 0, -0.7660444431189747), z_dir=(0, 1, 0))):
        Polygon((0, 0), (0, 11.091420021), (1.65, 10.1), (1.65, 0), align=None)
    m4_tapped_hole1 = revolve(axis=Axis((22.062037309, 10.094, -18.512247369), (-0.7660444431189746, 0, 0.6427876096865435)), mode=Mode.SUBTRACT)

    # M4 Tapped Hole1 at 2: M4 Tapped Hole1 ×2
    with Locations(*[(0, i * M4_TAPPED_HOLE1_AT_2_PITCH, 0) for i in range(1, M4_TAPPED_HOLE1_AT_2_COUNT)]):
        add(m4_tapped_hole1, mode=Mode.SUBTRACT)

    # Mirror1: M4 Tapped Hole1 across plane
    add(m4_tapped_hole1.mirror(Plane(origin=(0, 0, 0), x_dir=(0, 0, 1), z_dir=(1, 0, 0))), mode=Mode.SUBTRACT)

    # Mirror1 copy 1 sketch → Mirror1 copy 1 (revolve, cut)
    with BuildSketch(Plane(origin=(-17.197655095, 32.094, -14.430546047), x_dir=(0.6427876096865435, 0, -0.7660444431189747), z_dir=(0, 1, 0))):
        Polygon((0, 0), (0, -11.091420021), (1.65, -10.1), (1.65, 0), align=None)
    revolve(axis=Axis((-22.062037309, 32.094, -18.512247369), (-0.7660444431189746, 0, -0.6427876096865435)), mode=Mode.SUBTRACT)

    # Fillet4
    fillet4_edges = [part.edges().sort_by_distance(p)[0] for p in [
        (-7.5, 2.85, 6.748),
        (7.5, 2.85, 6.748),
    ]]
    fillet(fillet4_edges, radius=FILLET4_R)


solid = part.part
